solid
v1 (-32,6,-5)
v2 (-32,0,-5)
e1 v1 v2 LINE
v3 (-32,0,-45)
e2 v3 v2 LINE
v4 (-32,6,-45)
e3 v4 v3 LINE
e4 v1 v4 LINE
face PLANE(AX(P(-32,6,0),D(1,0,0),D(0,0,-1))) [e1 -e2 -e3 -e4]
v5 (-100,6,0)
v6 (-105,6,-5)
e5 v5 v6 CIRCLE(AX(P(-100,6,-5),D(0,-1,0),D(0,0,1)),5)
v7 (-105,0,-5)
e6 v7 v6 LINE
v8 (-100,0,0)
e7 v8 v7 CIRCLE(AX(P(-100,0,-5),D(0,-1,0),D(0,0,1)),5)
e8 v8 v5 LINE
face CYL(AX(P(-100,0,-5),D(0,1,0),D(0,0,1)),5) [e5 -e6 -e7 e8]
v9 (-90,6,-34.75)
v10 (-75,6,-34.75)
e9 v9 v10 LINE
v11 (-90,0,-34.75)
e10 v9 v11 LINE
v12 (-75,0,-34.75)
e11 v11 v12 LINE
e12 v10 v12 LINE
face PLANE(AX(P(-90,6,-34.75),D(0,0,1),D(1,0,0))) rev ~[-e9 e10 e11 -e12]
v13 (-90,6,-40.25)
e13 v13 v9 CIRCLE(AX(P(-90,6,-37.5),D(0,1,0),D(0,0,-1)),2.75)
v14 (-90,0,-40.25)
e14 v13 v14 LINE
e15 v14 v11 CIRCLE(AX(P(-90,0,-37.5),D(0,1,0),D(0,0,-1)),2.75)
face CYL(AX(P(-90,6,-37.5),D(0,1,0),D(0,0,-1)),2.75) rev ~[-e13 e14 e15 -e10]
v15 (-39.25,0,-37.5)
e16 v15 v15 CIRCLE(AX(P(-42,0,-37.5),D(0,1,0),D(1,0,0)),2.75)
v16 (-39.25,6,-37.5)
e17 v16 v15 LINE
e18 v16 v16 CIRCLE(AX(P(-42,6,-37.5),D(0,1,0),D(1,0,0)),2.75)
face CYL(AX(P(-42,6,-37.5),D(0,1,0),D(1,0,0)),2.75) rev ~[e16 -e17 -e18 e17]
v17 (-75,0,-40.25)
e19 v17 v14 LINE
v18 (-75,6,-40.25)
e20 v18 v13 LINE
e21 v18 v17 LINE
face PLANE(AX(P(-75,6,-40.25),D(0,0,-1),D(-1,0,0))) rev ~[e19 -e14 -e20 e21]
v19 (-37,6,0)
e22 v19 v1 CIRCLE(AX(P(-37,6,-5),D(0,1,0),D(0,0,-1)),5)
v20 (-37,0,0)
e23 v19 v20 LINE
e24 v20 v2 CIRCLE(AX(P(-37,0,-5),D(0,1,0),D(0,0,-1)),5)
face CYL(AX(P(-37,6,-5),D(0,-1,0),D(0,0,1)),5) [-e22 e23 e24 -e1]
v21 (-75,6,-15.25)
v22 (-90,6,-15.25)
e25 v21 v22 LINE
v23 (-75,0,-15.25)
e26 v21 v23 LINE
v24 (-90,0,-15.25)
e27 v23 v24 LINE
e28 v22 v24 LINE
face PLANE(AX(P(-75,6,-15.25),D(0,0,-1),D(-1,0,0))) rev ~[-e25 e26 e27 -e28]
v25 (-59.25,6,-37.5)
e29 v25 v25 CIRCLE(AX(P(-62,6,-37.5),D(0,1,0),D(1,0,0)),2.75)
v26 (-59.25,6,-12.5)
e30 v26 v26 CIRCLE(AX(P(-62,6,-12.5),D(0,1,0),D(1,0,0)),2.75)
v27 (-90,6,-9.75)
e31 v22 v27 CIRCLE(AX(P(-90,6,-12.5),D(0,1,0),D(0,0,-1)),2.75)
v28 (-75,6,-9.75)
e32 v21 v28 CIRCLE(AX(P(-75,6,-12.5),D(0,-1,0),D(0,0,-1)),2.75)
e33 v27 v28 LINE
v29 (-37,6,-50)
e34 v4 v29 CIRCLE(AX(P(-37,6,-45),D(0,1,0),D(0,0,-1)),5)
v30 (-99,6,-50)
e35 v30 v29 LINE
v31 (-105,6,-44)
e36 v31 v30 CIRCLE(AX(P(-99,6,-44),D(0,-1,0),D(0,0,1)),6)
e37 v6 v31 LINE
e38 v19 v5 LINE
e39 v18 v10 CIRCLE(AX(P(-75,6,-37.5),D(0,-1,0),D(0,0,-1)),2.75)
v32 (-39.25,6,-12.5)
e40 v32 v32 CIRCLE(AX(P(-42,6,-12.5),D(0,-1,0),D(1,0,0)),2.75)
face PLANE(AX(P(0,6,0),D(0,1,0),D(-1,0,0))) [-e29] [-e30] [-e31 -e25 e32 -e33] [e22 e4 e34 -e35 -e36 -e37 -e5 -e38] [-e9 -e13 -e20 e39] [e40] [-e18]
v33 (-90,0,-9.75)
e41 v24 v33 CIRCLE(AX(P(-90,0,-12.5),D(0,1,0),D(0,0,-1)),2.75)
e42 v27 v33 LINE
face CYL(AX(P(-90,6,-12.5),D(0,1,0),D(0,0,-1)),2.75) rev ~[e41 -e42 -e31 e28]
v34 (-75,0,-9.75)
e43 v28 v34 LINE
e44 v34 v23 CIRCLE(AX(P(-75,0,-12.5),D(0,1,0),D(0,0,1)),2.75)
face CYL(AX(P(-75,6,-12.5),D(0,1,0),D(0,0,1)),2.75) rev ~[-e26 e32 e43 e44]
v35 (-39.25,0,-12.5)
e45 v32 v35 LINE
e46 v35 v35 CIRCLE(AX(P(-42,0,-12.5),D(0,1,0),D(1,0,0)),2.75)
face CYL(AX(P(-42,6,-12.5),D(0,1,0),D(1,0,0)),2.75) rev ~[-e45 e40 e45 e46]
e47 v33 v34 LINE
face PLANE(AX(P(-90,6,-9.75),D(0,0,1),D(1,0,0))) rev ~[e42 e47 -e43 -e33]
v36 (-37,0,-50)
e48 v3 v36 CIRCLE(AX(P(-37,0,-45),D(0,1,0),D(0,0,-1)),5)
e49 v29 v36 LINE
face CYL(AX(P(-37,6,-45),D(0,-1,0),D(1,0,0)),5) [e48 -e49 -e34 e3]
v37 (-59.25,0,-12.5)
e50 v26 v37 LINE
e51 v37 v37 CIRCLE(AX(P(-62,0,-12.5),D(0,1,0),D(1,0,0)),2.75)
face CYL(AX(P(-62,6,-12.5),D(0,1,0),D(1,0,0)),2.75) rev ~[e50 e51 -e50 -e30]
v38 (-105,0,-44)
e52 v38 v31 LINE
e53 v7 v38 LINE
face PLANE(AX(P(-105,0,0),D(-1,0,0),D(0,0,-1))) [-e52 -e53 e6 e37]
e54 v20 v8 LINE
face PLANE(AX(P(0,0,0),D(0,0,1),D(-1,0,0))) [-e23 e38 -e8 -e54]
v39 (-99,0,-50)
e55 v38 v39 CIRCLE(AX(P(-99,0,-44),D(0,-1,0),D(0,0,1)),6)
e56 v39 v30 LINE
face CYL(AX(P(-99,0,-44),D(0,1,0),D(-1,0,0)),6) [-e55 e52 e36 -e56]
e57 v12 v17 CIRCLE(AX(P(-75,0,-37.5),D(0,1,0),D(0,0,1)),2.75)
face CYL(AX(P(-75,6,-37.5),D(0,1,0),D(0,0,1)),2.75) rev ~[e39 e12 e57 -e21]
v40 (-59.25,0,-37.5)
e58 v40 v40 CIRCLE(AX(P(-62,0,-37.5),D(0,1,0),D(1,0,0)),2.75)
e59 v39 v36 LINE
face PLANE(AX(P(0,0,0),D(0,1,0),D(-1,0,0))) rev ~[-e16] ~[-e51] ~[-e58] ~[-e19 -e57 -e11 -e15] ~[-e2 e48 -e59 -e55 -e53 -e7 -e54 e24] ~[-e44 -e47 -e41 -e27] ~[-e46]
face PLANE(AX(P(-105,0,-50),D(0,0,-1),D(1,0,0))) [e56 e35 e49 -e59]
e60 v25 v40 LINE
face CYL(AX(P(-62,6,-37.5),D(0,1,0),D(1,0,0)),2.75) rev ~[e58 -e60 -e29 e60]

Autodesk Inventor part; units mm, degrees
ref_plane "YZ Plane" through (0, 0, 0) normal (1, 0, 0) x (0, 1, 0)
ref_plane "XZ Plane" through (0, 0, 0) normal (0, 1, 0) x (-1, 0, 0)
ref_plane "XY Plane" through (0, 0, 0) normal (0, 0, 1) x (1, 0, 0)
sketch "Sketch1" plane through (0, 0, 0) normal (0, 1, 0) x (-1, 0, 0)
  line L0 (0, 0) -> (105, 0)
  line L1 (105, 0) -> (105, -50)
  line L2 (105, -50) -> (0, -50)
  line L3 (0, -50) -> (0, 0)
  line L4 (0, 0) -> (0, -16.6667)
  line L5 (0, -16.6667) -> (11, -16.6667)
  dimension "d0" = 105
  dimension "d1" = 50
  dimension "d2" = 16.6667
  dimension "d3" = 11
extrude "Extrusion1" add sketch "Sketch1" along normal blind 6
sketch "Sketch3" plane through (0, 6, 0) normal (0, 1, 0) x (1, 0, 0)
  circle A0 centre (-20, 12.5) radius 2.75
  line L0 (0, 0) -> (0, 50) projected
  line L1 (-105, 0) -> (0, 0) projected
  circle A1 centre (-20, 37.5) radius 2.75
  dimension "d21" = 5.5
  dimension "d22" = 20
  dimension "d23" = 12.5
  dimension "d26" = 25
extrude "Extrusion3" cut sketch "Sketch3" against normal through all
sketch "Sketch4" plane through (0, 6, 0) normal (0, 1, 0) x (1, 0, 0)
  circle A0 centre (-20, 12.5) radius 2.75 projected
  line L0 (-20, 12.5) -> (-75, 12.5)
  line L1 (-75, 12.5) -> (-90, 12.5) construction
  line L2 (-75, 15.25) -> (-90, 15.25)
  line L3 (-90, 9.75) -> (-75, 9.75)
  arc A1 (-75, 9.75) -> (-75, 15.25) centre (-75, 12.5) ccw
  arc A2 (-90, 15.25) -> (-90, 9.75) centre (-90, 12.5) ccw
  point P0 (0, 0)
  point P1 (-82.5, 12.5)
  dimension "d33" = 55
  dimension "d34" = 15
  dimension "d35" = 5.5
extrude "Extrusion4" cut sketch "Sketch4" against normal through all contours A1 L3 A2 L2
pattern_linear "Rectangular Pattern2" count 2 spacing 25 along (0, 0, -1) of "Extrusion4"
fillet "Fillet2" radius 5 3 edges at (-105, 3, 0) (0, 3, 0) (0, 3, -50)
sketch "Sketch7" plane through (0, 6, 0) normal (0, 1, 0) x (1, 0, 0)
  circle A0 centre (-20, 12.5) radius 2.75 projected
  line L0 (-20, 12.5) -> (-42, 12.5)
  line L1 (-42, 12.5) -> (-62, 12.5)
  circle A1 centre (-62, 12.5) radius 2.75
  circle A2 centre (-42, 12.5) radius 2.75
  line L2 (0, 5) -> (0, 45) projected
  line L3 (0, 0) -> (0, 45)
  circle A3 centre (-42, 37.5) radius 2.75
  circle A4 centre (-62, 37.5) radius 2.75
  dimension "d55" = 22
  dimension "d56" = 20
  dimension "d57" = 5.5
  dimension "d58" = 5.5
  dimension "d61" = 25
extrude "Extrusion7" cut sketch "Sketch7" against normal through all contours A2 L1 L0 | L0 L1 A2 | A1 | A3 | A4
sketch "Sketch9" plane through (0, 6, 0) normal (0, 1, 0) x (1, 0, 0)
  point P0 (0, 0)
sketch "Sketch12" plane through (0, 6, 0) normal (0, 1, 0) x (1, 0, 0)
  circle A0 centre (-42, 37.5) radius 2.75 projected
  line L0 (-42, 37.5) -> (-32, 37.5)
  line L1 (-32, 37.5) -> (-32, 50)
  line L2 (-5, 50) -> (-105, 50) projected
  line L3 (-32, 50) -> (0, 50)
  line L4 (0, 50) -> (0, 0)
  line L5 (0, 0) -> (-32, 0)
  line L6 (-32, 0) -> (-32, 50)
  point P0 (-74, 50)
  dimension "d87" = 10
extrude "Extrusion10" cut sketch "Sketch12" against normal blind 10 contours L1 L2 L3 L4 L5 L6
fillet "Fillet3" radius 5 2 edges at (-32, 3, 0) (-32, 3, -50)
fillet "Fillet4" radius 6 1 edges at (-105, 3, -50)
properties part number "X_Carriage_Plate_Short"
